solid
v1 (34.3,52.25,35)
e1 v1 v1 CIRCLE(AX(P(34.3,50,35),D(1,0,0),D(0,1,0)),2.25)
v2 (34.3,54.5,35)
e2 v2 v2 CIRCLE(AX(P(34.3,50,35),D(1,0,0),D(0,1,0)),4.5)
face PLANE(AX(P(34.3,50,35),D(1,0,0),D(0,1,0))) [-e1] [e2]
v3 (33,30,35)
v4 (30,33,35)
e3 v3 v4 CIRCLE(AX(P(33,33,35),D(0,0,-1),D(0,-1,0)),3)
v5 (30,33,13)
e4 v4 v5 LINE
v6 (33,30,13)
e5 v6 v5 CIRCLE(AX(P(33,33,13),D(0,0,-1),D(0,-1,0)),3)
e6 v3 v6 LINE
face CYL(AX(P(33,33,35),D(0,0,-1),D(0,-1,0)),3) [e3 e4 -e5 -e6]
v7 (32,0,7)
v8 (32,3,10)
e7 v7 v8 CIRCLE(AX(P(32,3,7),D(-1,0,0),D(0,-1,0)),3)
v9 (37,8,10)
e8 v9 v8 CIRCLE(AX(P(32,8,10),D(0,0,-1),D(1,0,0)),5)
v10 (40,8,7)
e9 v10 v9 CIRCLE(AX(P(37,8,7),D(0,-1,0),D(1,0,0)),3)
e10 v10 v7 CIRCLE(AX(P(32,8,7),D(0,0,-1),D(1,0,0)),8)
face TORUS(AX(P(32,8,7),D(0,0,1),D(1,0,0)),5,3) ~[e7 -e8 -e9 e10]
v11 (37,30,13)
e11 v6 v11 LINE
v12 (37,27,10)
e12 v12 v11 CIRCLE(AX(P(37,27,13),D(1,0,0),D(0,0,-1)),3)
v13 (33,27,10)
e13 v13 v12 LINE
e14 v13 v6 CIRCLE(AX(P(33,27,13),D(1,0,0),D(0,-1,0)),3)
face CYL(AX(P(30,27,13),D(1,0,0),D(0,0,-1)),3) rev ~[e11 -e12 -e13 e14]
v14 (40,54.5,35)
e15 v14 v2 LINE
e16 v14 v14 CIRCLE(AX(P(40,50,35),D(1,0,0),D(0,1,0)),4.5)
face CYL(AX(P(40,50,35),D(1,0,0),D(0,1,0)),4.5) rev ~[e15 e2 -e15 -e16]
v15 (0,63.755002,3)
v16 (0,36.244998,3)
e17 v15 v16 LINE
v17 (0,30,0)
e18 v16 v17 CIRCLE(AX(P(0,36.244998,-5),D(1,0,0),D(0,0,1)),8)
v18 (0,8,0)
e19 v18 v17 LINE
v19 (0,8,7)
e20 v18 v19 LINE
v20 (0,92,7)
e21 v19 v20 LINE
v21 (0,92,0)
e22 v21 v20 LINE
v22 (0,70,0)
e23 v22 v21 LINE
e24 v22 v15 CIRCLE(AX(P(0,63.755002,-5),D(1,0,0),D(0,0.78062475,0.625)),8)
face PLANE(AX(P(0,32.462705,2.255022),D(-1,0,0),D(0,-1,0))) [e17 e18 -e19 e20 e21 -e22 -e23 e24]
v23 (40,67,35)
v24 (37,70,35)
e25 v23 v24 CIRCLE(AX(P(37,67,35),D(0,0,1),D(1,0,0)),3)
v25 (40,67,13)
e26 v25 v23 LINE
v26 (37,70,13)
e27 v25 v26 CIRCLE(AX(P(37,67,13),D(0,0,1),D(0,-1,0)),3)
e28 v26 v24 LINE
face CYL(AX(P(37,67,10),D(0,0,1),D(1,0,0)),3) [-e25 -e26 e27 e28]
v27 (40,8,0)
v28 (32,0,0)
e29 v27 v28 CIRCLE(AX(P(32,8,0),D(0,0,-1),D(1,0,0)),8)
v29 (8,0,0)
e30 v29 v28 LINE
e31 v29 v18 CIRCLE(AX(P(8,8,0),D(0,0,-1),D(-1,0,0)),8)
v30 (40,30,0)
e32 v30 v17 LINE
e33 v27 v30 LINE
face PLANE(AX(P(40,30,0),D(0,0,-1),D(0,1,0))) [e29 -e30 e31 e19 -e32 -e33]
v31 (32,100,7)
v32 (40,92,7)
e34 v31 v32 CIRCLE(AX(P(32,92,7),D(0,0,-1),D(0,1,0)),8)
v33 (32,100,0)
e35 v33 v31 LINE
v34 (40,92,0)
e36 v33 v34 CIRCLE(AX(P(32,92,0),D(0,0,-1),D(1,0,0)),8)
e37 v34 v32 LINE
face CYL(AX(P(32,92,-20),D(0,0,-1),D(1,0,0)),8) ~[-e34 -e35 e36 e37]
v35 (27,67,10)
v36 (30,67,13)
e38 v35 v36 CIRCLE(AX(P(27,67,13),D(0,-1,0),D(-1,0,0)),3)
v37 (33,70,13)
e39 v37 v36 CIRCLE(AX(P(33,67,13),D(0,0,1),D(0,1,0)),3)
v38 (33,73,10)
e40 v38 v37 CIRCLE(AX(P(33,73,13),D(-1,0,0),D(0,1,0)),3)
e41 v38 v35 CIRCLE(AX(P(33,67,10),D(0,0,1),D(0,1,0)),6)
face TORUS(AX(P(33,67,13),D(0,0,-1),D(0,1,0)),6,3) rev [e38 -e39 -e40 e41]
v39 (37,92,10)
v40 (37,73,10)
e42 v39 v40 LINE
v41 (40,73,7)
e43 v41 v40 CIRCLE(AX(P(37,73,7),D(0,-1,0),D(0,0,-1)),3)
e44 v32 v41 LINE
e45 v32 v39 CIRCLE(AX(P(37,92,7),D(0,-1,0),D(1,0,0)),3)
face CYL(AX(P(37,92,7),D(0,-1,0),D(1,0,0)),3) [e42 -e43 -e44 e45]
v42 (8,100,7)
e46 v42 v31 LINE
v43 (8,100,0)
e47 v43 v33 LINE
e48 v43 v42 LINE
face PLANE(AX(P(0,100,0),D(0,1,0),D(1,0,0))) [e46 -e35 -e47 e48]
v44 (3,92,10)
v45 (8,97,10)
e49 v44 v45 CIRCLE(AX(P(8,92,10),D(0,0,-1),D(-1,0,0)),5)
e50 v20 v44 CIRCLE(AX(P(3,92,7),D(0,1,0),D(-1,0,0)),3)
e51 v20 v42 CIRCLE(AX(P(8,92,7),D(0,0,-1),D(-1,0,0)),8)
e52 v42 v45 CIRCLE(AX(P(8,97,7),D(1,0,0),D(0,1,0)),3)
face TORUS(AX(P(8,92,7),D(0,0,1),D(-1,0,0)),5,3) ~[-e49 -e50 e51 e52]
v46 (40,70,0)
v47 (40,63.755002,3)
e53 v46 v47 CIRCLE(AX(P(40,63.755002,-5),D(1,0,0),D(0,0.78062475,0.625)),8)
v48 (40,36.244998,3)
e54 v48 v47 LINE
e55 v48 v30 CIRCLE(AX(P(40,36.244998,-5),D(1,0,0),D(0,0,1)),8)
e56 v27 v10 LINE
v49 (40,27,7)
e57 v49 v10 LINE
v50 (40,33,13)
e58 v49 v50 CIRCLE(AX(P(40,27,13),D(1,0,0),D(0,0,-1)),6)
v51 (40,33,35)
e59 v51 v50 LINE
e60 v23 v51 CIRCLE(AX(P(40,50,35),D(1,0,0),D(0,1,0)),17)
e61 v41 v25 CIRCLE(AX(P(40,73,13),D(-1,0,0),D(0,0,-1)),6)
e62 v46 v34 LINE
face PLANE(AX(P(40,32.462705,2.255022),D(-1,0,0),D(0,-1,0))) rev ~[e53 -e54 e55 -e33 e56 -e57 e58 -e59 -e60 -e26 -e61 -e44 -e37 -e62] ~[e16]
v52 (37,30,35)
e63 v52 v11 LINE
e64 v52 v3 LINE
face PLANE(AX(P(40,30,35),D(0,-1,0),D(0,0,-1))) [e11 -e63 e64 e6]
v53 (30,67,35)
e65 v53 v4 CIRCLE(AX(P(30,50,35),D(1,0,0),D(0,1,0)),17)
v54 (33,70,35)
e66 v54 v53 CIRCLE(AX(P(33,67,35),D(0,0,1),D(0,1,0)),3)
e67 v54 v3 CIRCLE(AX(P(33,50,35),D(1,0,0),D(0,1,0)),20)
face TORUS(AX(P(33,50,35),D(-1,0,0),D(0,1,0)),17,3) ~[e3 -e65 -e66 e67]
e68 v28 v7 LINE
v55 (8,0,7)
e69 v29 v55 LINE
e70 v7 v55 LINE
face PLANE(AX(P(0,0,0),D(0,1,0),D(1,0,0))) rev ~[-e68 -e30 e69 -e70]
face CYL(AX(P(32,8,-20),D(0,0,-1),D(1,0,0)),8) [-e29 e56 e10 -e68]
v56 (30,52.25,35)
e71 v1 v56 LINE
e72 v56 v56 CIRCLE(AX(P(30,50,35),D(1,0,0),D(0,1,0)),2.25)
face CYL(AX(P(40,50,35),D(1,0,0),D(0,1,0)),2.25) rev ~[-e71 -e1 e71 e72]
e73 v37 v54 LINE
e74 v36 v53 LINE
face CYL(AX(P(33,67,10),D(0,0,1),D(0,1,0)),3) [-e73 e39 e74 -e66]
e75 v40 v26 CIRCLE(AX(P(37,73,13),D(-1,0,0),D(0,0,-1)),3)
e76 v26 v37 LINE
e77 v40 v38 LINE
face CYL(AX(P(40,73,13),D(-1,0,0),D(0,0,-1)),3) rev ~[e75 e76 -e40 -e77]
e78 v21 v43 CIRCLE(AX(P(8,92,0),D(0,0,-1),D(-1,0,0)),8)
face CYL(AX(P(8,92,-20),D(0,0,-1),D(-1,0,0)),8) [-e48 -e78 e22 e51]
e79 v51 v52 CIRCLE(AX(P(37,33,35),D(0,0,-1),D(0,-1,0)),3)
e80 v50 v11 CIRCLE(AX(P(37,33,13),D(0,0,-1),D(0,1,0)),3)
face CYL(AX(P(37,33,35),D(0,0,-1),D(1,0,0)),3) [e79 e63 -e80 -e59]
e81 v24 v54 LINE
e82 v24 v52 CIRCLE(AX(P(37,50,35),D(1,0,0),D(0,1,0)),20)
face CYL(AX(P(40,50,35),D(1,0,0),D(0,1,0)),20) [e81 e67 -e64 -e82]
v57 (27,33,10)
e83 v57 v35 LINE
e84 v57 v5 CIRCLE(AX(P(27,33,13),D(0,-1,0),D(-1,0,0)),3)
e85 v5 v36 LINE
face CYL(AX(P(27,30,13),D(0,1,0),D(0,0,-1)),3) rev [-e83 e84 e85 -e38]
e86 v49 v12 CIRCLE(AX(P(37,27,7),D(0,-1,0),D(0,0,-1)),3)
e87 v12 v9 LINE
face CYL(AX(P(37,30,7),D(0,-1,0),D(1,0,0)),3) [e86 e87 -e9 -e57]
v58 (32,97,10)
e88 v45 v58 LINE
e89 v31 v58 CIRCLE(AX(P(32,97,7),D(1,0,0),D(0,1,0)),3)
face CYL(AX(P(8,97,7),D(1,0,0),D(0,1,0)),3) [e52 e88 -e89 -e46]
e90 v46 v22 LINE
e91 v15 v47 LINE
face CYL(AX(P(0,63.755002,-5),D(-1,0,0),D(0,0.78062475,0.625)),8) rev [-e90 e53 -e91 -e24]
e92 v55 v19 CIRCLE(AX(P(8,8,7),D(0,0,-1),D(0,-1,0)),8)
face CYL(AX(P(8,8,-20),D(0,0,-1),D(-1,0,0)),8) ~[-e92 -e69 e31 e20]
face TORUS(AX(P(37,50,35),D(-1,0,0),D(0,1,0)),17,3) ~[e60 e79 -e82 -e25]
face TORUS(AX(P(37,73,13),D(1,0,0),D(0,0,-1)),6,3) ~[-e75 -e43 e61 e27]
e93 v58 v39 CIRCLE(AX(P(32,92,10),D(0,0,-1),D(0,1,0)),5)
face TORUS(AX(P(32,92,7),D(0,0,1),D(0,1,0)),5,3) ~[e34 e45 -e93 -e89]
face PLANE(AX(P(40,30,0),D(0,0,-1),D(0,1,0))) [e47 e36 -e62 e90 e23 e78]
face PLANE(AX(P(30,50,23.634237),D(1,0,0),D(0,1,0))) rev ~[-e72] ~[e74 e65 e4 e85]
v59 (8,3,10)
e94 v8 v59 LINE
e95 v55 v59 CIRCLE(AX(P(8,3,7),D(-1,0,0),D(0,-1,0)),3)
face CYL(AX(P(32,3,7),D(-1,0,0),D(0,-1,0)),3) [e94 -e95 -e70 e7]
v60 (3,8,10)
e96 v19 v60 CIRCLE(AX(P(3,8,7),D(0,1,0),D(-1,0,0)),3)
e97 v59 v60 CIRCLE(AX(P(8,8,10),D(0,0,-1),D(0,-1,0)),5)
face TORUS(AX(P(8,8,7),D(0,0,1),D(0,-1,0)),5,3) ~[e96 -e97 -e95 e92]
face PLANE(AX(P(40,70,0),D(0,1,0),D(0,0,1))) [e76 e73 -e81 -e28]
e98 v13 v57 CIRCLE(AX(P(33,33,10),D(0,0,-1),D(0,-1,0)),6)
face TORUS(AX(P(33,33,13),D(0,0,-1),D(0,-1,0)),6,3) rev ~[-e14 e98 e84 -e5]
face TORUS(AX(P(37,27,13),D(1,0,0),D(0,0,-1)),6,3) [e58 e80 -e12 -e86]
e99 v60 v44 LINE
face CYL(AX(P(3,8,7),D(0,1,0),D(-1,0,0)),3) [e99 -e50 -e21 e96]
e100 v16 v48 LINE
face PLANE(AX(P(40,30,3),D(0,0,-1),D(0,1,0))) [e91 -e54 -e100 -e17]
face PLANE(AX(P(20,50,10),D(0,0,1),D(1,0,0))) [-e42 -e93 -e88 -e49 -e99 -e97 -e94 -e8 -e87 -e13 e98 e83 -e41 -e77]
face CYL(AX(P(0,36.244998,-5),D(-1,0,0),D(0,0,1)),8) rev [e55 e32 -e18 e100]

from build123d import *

# Parameters (mm, degrees)
F0_W          = 40
F0_H          = 100
F1_DEPTH      = 10
F3_DEPTH      = 10
F4_W          = 40
F4_H          = 3
F5_DEPTH      = 40.001
F6_R          = 2.25
F7_DEPTH      = 40.001
F8_R          = 4.5
F9_DEPTH      = 5.7
F10_T1_DEPTH  = 40
F10_T3_DEPTH  = 40
F10_T5_DEPTH  = 50
F10_T7_DEPTH  = 50
F10_T9_DEPTH  = 50
F10_T11_DEPTH = 50
F11_R         = 3


# Not quite as in the source:
# - a fillet or chamfer that OpenCascade refuses, or shapes differently, is made with other operations: its cross-section is extruded or revolved along the edge and cut away or added


with BuildPart() as f1:
    # F0 (on Top) → F1 (new body)
    with BuildSketch(Plane.XY):
        with Locations((20, 50)):
            Rectangle(F0_W, F0_H)
    extrude(amount=F1_DEPTH)

    # F2 (on face) → F3 (join)
    with BuildSketch(Plane.YZ.offset(40)):
        with BuildLine():
            Line((30, 35), (30, 0))
            Line((30, 0), (70, 0))
            Line((70, 0), (70, 35))
            ThreePointArc((70, 35), (50, 55), (30, 35))
        make_face()
    extrude(amount=-F3_DEPTH)

    # F4 (on face) → F5 (cut, through all)
    with BuildSketch(Plane.YZ.offset(40)):
        with Locations((50, 1.5)):
            Rectangle(F4_W, F4_H)
    extrude(amount=-F5_DEPTH, mode=Mode.SUBTRACT)

    # F6 (on face) → F7 (cut, through all)
    with BuildSketch(Plane.YZ.offset(40)):
        with Locations((50, 35)):
            Circle(F6_R)
    extrude(amount=-F7_DEPTH, mode=Mode.SUBTRACT)

    # F8 (on face) → F9 (cut)
    with BuildSketch(Plane.YZ.offset(40)):
        with Locations((50, 35)):
            Circle(F8_R)
    extrude(amount=-F9_DEPTH, mode=Mode.SUBTRACT)

    # F10: fillet of radius 8 on 6 edges, made by hand

    # F10_s2 → F10_t1 (join)
    with BuildSketch(Plane.YZ):
        with BuildLine():
            ThreePointArc((70, 0), (67.2191036167, 2.2111025509), (63.7550020016, 3))
            Line((63.7550020016, 3), (70, 3))
            Line((70, 3), (70, 0))
        make_face()
    extrude(amount=F10_T1_DEPTH)

    # F10_s4 → F10_t3 (join)
    with BuildSketch(Plane.YZ):
        with BuildLine():
            ThreePointArc((36.2449979984, 3), (32.7808963833, 2.2111025509), (30, 0))
            Line((30, 0), (30, 3))
            Line((30, 3), (36.2449979984, 3))
        make_face()
    extrude(amount=F10_T3_DEPTH)

    # F10_s6 → F10_t5 (cut)
    with BuildSketch(Plane.XY.offset(-20)):
        with BuildLine():
            ThreePointArc((0, 8), (2.3431457505, 2.3431457505), (8, 0))
            Line((8, 0), (0, 0))
            Line((0, 0), (0, 8))
        make_face()
    extrude(amount=F10_T5_DEPTH, mode=Mode.SUBTRACT)

    # F10_s8 → F10_t7 (cut)
    with BuildSketch(Plane.XY.offset(-20)):
        with BuildLine():
            ThreePointArc((0, 92), (2.3431457505, 97.6568542495), (8, 100))
            Line((8, 100), (0, 100))
            Line((0, 100), (0, 92))
        make_face()
    extrude(amount=F10_T7_DEPTH, mode=Mode.SUBTRACT)

    # F10_s10 → F10_t9 (cut)
    with BuildSketch(Plane.XY.offset(-20)):
        with BuildLine():
            ThreePointArc((40, 8), (37.6568542495, 2.3431457505), (32, 0))
            Line((32, 0), (40, 0))
            Line((40, 0), (40, 8))
        make_face()
    extrude(amount=F10_T9_DEPTH, mode=Mode.SUBTRACT)

    # F10_s12 → F10_t11 (cut)
    with BuildSketch(Plane.XY.offset(-20)):
        with BuildLine():
            ThreePointArc((40, 92), (37.6568542495, 97.6568542495), (32, 100))
            Line((32, 100), (40, 100))
            Line((40, 100), (40, 92))
        make_face()
    extrude(amount=F10_T11_DEPTH, mode=Mode.SUBTRACT)

    # F11
    f11_edges = [f1.edges().sort_by_distance(p)[0] for p in [
        (40, 50, 55),
        (30, 50, 55),
        (35, 70, 10),
        (35, 30, 10),
        (0, 50, 10),
        (2.343146, 2.343146, 10),
        (30, 50, 10),
        (40, 19, 10),
        (37.656854, 2.343146, 10),
        (20, 0, 10),
        (2.343146, 97.656854, 10),
        (20, 100, 10),
        (37.656854, 97.656854, 10),
        (40, 81, 10),
        (40, 70, 22.5),
        (40, 30, 22.5),
        (30, 70, 22.5),
        (30, 30, 22.5),
    ]]
    fillet(f11_edges, radius=F11_R)


solid = f1.part
